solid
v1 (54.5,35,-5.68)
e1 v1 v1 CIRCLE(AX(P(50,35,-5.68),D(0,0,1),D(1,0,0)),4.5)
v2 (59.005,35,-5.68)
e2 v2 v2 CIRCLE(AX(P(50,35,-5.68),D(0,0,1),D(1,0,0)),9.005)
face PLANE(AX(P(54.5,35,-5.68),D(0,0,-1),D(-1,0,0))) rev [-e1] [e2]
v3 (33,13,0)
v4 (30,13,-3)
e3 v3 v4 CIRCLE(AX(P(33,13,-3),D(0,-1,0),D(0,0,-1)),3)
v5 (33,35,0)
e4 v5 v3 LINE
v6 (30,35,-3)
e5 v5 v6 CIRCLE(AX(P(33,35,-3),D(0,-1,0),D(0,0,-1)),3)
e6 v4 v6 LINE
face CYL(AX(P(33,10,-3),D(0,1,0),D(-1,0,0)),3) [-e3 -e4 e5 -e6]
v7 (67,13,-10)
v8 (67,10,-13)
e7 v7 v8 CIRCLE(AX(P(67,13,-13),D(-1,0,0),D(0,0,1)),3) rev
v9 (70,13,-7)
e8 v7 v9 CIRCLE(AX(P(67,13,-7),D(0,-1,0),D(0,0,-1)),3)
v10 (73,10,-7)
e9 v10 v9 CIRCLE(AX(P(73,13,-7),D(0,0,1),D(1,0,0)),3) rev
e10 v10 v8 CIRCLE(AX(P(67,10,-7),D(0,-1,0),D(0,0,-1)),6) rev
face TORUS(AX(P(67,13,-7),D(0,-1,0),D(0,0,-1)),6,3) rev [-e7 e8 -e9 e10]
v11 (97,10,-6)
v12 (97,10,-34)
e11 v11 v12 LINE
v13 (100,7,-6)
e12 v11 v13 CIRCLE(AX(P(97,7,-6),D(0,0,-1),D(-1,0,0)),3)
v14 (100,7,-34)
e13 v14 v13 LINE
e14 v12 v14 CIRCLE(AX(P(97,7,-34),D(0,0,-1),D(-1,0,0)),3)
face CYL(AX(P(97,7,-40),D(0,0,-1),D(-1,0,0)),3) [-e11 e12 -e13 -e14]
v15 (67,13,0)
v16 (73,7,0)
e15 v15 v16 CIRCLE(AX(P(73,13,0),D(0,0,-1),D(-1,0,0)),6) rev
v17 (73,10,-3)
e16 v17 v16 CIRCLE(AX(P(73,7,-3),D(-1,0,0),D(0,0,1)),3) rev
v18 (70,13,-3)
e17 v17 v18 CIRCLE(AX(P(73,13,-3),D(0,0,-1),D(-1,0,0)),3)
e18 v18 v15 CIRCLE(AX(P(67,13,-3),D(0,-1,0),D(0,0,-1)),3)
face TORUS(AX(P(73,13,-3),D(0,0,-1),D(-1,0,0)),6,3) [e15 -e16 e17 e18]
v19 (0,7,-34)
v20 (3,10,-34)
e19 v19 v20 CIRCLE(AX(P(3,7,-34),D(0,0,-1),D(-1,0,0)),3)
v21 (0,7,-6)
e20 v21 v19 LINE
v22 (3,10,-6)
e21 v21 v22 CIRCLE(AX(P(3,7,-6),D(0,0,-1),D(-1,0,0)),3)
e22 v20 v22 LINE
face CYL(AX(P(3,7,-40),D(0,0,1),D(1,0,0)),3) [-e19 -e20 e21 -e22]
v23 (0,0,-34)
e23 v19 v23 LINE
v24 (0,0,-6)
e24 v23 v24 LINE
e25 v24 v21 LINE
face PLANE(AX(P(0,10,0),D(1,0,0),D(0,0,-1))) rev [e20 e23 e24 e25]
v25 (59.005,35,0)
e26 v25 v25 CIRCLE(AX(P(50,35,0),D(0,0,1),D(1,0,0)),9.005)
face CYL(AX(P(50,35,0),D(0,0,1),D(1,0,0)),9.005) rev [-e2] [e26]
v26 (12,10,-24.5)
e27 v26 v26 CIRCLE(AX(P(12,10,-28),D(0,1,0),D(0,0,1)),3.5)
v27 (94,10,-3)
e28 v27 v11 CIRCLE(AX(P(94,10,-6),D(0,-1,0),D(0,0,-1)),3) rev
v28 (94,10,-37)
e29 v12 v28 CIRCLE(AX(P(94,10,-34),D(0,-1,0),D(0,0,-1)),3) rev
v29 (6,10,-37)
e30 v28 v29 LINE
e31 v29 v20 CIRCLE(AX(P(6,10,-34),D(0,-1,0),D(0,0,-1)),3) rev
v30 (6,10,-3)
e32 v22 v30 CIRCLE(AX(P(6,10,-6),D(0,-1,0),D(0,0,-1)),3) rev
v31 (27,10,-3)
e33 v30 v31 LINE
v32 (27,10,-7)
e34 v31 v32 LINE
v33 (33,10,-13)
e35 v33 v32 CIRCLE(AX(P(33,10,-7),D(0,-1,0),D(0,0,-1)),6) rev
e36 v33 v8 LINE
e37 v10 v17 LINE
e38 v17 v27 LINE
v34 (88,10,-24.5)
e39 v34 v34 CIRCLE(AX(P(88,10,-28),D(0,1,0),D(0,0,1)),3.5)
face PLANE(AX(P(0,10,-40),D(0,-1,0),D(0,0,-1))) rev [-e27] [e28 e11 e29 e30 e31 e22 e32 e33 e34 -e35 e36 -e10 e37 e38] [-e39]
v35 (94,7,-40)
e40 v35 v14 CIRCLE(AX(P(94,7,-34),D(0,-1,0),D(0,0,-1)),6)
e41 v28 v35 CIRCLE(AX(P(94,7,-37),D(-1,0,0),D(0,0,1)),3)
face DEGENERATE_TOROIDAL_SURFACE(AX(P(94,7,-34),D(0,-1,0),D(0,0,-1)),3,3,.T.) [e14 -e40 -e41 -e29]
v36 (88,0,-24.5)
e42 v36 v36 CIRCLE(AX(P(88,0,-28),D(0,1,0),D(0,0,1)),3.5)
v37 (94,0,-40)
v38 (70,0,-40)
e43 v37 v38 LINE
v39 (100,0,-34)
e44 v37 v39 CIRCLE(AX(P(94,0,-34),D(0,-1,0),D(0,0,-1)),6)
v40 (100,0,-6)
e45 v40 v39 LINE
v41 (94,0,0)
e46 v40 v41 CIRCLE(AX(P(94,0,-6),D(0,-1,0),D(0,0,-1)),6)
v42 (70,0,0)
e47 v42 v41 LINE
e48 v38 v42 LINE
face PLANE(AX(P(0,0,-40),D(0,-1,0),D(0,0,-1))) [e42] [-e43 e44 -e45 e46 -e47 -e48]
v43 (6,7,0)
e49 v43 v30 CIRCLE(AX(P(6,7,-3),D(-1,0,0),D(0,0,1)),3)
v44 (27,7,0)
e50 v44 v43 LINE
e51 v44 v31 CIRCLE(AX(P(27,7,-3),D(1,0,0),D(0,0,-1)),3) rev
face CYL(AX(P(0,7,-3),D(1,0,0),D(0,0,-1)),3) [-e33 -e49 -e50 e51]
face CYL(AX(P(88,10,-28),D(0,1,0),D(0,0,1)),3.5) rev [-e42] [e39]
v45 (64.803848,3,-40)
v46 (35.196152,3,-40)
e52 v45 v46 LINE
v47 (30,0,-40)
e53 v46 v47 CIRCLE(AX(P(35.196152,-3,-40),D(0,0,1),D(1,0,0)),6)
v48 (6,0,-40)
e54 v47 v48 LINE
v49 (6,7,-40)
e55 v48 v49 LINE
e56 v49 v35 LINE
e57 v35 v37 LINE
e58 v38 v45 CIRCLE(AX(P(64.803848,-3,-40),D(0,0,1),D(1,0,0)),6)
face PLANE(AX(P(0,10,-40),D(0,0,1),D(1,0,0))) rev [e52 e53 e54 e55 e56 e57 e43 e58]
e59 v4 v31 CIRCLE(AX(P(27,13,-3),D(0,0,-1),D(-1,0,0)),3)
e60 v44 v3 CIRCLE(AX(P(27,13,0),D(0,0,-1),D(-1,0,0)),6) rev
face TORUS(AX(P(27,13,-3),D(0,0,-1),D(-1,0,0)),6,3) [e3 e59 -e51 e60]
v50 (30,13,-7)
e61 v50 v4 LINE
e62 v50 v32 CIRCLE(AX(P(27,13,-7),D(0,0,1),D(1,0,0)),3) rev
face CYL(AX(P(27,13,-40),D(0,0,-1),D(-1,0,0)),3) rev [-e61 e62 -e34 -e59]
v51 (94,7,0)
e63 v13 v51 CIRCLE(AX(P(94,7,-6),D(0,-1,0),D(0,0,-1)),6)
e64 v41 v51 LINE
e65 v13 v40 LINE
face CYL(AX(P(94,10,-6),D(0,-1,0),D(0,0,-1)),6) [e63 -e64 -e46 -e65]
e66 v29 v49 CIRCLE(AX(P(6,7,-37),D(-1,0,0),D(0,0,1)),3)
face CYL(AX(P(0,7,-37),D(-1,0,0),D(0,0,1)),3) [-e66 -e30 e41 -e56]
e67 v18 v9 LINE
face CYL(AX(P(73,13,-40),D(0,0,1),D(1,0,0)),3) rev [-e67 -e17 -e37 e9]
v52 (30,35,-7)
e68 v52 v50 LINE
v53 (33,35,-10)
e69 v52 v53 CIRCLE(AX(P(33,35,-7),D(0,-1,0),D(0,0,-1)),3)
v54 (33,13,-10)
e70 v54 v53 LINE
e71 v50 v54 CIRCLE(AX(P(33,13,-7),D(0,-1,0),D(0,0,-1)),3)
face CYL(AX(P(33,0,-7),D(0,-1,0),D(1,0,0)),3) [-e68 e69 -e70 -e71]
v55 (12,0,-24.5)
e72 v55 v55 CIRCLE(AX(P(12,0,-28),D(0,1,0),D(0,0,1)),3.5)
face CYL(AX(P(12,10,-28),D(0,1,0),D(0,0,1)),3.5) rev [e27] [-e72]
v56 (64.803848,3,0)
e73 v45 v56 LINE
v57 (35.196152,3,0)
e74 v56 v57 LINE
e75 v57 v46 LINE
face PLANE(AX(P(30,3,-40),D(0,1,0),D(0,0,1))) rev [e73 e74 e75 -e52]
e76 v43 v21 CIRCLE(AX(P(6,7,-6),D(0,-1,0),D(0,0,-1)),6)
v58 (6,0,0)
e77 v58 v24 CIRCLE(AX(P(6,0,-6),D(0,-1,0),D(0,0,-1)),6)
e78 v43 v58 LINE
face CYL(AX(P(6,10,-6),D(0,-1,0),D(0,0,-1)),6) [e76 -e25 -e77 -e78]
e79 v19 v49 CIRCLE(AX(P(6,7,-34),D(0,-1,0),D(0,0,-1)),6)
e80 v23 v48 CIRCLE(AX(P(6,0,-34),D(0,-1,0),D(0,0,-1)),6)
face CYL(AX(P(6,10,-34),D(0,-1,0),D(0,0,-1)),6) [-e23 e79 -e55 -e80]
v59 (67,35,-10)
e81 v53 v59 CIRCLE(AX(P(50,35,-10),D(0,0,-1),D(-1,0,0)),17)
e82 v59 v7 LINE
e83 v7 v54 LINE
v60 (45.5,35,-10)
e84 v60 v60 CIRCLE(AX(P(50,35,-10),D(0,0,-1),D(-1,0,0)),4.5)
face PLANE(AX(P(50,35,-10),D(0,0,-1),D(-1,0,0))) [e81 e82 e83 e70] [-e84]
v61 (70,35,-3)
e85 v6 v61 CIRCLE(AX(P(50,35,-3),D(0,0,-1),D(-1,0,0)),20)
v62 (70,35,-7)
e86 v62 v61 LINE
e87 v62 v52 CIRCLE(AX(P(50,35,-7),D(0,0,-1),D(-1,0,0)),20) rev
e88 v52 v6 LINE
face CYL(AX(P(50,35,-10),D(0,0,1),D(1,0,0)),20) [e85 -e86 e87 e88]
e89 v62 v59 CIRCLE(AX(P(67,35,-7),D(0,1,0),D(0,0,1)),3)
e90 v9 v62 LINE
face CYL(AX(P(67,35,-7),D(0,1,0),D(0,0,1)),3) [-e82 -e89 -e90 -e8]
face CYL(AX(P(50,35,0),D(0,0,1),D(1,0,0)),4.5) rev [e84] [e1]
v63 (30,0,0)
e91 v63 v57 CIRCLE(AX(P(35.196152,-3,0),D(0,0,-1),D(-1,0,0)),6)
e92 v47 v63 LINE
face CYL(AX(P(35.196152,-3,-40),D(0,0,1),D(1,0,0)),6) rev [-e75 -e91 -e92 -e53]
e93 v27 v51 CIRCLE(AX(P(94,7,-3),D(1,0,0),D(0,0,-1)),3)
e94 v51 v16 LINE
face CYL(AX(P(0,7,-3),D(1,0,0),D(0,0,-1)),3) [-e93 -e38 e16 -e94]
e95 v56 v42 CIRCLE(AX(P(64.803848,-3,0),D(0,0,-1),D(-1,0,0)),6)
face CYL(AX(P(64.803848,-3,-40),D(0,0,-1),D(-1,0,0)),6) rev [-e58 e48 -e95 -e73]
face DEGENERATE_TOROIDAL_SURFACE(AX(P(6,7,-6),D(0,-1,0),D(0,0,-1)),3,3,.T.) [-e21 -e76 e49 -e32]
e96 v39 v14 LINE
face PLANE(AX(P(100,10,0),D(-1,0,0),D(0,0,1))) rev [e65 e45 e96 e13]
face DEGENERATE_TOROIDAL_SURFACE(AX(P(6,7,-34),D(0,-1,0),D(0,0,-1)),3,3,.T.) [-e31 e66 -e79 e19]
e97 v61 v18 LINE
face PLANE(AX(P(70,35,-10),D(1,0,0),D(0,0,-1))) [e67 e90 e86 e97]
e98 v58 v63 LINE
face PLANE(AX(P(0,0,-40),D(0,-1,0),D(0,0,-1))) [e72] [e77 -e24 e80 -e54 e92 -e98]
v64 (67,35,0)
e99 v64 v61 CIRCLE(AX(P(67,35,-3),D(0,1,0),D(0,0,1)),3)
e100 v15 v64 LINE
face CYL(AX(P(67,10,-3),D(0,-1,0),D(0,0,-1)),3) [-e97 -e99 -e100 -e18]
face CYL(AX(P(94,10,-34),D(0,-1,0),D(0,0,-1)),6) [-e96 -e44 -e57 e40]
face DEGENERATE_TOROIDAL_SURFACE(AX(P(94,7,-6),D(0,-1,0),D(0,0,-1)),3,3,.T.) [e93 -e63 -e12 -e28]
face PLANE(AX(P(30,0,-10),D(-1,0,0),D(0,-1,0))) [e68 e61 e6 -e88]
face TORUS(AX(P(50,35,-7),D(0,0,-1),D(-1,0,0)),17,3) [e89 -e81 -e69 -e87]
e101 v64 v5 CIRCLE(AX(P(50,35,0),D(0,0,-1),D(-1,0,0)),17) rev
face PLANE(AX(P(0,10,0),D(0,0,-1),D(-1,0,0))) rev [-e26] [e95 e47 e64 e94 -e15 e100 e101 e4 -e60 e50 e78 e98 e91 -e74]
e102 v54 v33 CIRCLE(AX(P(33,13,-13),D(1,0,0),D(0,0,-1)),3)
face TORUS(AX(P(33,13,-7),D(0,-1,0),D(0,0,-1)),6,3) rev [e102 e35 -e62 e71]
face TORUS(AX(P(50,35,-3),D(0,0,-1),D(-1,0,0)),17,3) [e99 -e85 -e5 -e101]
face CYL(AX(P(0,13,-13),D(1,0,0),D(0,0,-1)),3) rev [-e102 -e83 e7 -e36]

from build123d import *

# Parameters (mm, degrees)
SKETCH1_W                               = 100
SKETCH1_H                               = 40
BASE_PLATE_DEPTH                        = 10
VERT_BOSS_DEPTH                         = 10
SKETCH5_W                               = 40
SKETCH5_H                               = 3
SLOT_DEPTH                              = 121.933866224
HOLE_WIZARD_7_0_7_1_D                   = 7
CBORE_FOR_M8_HEX_HEAD_BOLT1_D           = 9
CBORE_FOR_M8_HEX_HEAD_BOLT1_CBORE_D     = 18.01
CBORE_FOR_M8_HEX_HEAD_BOLT1_CBORE_DEPTH = 5.68
FILLET_1_R                              = 6
FILLET_2_R                              = 3


with BuildPart() as part:
    # Sketch1 → Base Plate (new body)
    with BuildSketch(Plane(origin=(0, 0, 0), x_dir=(1, 0, 0), z_dir=(0, 1, 0))):
        with Locations((50, 20)):
            Rectangle(SKETCH1_W, SKETCH1_H)
    extrude(amount=BASE_PLATE_DEPTH)

    # Sketch2 → Vert Boss (add)
    with BuildSketch(Plane.XY):
        with BuildLine():
            Line((30, 0), (30, 35))
            ThreePointArc((30, 35), (50, 55), (70, 35))
            Line((70, 35), (70, 0))
            Line((70, 0), (30, 0))
        make_face()
    extrude(amount=-VERT_BOSS_DEPTH)

    # Sketch5 → Slot (cut, through all)
    with BuildSketch(Plane.XY):
        with Locations((50, 1.5)):
            Rectangle(SKETCH5_W, SKETCH5_H)
    extrude(amount=-SLOT_DEPTH, mode=Mode.SUBTRACT)

    # Ø7.0 (7) 直徑孔1 (through all)
    with Locations(Plane(origin=(0, 10, 0), x_dir=(-1, 0, 0), z_dir=(0, 1, 0))):
        with Locations((-88, -28), (-12, -28)):
            Hole(HOLE_WIZARD_7_0_7_1_D / 2)

    # CBORE for M8 Hex Head Bolt1 (through all)
    with Locations(Plane.XY):
        with Locations((50, 35)):
            CounterBoreHole(CBORE_FOR_M8_HEX_HEAD_BOLT1_D / 2, CBORE_FOR_M8_HEX_HEAD_BOLT1_CBORE_D / 2, CBORE_FOR_M8_HEX_HEAD_BOLT1_CBORE_DEPTH)

    # 圓角1
    # the kernel refuses this fillet: 6 mm, written as the material it adds along each edge
    with BuildSketch(Plane(origin=(70, 3, 0), x_dir=(-1, 0, 0), z_dir=(0, 0, -1))) as fillet_1_piece_1:
        with BuildLine():
            CenterArc((5.196152423, -6), FILLET_1_R, 90, 60)
            Line((0, -3), (0, 0))
            Line((0, 0), (5.196152423, 0))
        make_face()
    extrude(amount=40)
    with BuildSketch(Plane(origin=(30, 3, 0), x_dir=(0, -1, 0), z_dir=(0, 0, -1))) as fillet_1_piece_2:
        with BuildLine():
            CenterArc((6, -5.196152423), FILLET_1_R, 120, 60)
            Line((0, -5.196152423), (0, 0))
            Line((0, 0), (3, 0))
        make_face()
    extrude(amount=40)
    # the kernel refuses this fillet: 6 mm, written as the material it takes off along each edge
    with BuildSketch(Plane(origin=(0, -15, 0), x_dir=(1, 0, 0), z_dir=(0, 1, 0)), Plane(origin=(0, -15, -40), x_dir=(0, 0, 1), z_dir=(0, 1, 0))) as fillet_1_2_piece_1:
        with BuildLine():
            CenterArc((FILLET_1_R, FILLET_1_R), FILLET_1_R, 180, 90)
            Line((0, FILLET_1_R), (0, 0))
            Line((0, 0), (FILLET_1_R, 0))
        make_face()
    extrude(amount=40, mode=Mode.SUBTRACT)
    with BuildSketch(Plane(origin=(100, -15, -40), x_dir=(0, 0, 1), z_dir=(0, 1, 0)), Plane(origin=(100, -15, 0), x_dir=(-1, 0, 0), z_dir=(0, 1, 0))) as fillet_1_2_piece_2:
        with BuildLine():
            CenterArc((FILLET_1_R, -FILLET_1_R), FILLET_1_R, 90, 90)
            Line((0, -FILLET_1_R), (0, 0))
            Line((0, 0), (FILLET_1_R, 0))
        make_face()
    extrude(amount=40, mode=Mode.SUBTRACT)

    # 圓角2
    fillet_2_edges = [part.edges().sort_by_distance(p)[0] for p in [
        (82, 10, 0),
        (30, 22.5, -10),
        (70, 22.5, -10),
        (30, 22.5, 0),
        (70, 22.5, 0),
        (50, 55, 0),
        (30, 10, -5),
        (50, 55, -10),
        (70, 10, -5),
        (50, 10, -10),
        (18, 10, 0),
        (0, 10, -20),
        (100, 10, -20),
        (50, 10, -40),
        (98.242640687, 10, -1.757359313),
        (98.242640687, 10, -38.242640687),
        (1.757359313, 10, -38.242640687),
        (1.757359313, 10, -1.757359313),
    ]]
    fillet(fillet_2_edges, radius=FILLET_2_R)


solid = part.part
